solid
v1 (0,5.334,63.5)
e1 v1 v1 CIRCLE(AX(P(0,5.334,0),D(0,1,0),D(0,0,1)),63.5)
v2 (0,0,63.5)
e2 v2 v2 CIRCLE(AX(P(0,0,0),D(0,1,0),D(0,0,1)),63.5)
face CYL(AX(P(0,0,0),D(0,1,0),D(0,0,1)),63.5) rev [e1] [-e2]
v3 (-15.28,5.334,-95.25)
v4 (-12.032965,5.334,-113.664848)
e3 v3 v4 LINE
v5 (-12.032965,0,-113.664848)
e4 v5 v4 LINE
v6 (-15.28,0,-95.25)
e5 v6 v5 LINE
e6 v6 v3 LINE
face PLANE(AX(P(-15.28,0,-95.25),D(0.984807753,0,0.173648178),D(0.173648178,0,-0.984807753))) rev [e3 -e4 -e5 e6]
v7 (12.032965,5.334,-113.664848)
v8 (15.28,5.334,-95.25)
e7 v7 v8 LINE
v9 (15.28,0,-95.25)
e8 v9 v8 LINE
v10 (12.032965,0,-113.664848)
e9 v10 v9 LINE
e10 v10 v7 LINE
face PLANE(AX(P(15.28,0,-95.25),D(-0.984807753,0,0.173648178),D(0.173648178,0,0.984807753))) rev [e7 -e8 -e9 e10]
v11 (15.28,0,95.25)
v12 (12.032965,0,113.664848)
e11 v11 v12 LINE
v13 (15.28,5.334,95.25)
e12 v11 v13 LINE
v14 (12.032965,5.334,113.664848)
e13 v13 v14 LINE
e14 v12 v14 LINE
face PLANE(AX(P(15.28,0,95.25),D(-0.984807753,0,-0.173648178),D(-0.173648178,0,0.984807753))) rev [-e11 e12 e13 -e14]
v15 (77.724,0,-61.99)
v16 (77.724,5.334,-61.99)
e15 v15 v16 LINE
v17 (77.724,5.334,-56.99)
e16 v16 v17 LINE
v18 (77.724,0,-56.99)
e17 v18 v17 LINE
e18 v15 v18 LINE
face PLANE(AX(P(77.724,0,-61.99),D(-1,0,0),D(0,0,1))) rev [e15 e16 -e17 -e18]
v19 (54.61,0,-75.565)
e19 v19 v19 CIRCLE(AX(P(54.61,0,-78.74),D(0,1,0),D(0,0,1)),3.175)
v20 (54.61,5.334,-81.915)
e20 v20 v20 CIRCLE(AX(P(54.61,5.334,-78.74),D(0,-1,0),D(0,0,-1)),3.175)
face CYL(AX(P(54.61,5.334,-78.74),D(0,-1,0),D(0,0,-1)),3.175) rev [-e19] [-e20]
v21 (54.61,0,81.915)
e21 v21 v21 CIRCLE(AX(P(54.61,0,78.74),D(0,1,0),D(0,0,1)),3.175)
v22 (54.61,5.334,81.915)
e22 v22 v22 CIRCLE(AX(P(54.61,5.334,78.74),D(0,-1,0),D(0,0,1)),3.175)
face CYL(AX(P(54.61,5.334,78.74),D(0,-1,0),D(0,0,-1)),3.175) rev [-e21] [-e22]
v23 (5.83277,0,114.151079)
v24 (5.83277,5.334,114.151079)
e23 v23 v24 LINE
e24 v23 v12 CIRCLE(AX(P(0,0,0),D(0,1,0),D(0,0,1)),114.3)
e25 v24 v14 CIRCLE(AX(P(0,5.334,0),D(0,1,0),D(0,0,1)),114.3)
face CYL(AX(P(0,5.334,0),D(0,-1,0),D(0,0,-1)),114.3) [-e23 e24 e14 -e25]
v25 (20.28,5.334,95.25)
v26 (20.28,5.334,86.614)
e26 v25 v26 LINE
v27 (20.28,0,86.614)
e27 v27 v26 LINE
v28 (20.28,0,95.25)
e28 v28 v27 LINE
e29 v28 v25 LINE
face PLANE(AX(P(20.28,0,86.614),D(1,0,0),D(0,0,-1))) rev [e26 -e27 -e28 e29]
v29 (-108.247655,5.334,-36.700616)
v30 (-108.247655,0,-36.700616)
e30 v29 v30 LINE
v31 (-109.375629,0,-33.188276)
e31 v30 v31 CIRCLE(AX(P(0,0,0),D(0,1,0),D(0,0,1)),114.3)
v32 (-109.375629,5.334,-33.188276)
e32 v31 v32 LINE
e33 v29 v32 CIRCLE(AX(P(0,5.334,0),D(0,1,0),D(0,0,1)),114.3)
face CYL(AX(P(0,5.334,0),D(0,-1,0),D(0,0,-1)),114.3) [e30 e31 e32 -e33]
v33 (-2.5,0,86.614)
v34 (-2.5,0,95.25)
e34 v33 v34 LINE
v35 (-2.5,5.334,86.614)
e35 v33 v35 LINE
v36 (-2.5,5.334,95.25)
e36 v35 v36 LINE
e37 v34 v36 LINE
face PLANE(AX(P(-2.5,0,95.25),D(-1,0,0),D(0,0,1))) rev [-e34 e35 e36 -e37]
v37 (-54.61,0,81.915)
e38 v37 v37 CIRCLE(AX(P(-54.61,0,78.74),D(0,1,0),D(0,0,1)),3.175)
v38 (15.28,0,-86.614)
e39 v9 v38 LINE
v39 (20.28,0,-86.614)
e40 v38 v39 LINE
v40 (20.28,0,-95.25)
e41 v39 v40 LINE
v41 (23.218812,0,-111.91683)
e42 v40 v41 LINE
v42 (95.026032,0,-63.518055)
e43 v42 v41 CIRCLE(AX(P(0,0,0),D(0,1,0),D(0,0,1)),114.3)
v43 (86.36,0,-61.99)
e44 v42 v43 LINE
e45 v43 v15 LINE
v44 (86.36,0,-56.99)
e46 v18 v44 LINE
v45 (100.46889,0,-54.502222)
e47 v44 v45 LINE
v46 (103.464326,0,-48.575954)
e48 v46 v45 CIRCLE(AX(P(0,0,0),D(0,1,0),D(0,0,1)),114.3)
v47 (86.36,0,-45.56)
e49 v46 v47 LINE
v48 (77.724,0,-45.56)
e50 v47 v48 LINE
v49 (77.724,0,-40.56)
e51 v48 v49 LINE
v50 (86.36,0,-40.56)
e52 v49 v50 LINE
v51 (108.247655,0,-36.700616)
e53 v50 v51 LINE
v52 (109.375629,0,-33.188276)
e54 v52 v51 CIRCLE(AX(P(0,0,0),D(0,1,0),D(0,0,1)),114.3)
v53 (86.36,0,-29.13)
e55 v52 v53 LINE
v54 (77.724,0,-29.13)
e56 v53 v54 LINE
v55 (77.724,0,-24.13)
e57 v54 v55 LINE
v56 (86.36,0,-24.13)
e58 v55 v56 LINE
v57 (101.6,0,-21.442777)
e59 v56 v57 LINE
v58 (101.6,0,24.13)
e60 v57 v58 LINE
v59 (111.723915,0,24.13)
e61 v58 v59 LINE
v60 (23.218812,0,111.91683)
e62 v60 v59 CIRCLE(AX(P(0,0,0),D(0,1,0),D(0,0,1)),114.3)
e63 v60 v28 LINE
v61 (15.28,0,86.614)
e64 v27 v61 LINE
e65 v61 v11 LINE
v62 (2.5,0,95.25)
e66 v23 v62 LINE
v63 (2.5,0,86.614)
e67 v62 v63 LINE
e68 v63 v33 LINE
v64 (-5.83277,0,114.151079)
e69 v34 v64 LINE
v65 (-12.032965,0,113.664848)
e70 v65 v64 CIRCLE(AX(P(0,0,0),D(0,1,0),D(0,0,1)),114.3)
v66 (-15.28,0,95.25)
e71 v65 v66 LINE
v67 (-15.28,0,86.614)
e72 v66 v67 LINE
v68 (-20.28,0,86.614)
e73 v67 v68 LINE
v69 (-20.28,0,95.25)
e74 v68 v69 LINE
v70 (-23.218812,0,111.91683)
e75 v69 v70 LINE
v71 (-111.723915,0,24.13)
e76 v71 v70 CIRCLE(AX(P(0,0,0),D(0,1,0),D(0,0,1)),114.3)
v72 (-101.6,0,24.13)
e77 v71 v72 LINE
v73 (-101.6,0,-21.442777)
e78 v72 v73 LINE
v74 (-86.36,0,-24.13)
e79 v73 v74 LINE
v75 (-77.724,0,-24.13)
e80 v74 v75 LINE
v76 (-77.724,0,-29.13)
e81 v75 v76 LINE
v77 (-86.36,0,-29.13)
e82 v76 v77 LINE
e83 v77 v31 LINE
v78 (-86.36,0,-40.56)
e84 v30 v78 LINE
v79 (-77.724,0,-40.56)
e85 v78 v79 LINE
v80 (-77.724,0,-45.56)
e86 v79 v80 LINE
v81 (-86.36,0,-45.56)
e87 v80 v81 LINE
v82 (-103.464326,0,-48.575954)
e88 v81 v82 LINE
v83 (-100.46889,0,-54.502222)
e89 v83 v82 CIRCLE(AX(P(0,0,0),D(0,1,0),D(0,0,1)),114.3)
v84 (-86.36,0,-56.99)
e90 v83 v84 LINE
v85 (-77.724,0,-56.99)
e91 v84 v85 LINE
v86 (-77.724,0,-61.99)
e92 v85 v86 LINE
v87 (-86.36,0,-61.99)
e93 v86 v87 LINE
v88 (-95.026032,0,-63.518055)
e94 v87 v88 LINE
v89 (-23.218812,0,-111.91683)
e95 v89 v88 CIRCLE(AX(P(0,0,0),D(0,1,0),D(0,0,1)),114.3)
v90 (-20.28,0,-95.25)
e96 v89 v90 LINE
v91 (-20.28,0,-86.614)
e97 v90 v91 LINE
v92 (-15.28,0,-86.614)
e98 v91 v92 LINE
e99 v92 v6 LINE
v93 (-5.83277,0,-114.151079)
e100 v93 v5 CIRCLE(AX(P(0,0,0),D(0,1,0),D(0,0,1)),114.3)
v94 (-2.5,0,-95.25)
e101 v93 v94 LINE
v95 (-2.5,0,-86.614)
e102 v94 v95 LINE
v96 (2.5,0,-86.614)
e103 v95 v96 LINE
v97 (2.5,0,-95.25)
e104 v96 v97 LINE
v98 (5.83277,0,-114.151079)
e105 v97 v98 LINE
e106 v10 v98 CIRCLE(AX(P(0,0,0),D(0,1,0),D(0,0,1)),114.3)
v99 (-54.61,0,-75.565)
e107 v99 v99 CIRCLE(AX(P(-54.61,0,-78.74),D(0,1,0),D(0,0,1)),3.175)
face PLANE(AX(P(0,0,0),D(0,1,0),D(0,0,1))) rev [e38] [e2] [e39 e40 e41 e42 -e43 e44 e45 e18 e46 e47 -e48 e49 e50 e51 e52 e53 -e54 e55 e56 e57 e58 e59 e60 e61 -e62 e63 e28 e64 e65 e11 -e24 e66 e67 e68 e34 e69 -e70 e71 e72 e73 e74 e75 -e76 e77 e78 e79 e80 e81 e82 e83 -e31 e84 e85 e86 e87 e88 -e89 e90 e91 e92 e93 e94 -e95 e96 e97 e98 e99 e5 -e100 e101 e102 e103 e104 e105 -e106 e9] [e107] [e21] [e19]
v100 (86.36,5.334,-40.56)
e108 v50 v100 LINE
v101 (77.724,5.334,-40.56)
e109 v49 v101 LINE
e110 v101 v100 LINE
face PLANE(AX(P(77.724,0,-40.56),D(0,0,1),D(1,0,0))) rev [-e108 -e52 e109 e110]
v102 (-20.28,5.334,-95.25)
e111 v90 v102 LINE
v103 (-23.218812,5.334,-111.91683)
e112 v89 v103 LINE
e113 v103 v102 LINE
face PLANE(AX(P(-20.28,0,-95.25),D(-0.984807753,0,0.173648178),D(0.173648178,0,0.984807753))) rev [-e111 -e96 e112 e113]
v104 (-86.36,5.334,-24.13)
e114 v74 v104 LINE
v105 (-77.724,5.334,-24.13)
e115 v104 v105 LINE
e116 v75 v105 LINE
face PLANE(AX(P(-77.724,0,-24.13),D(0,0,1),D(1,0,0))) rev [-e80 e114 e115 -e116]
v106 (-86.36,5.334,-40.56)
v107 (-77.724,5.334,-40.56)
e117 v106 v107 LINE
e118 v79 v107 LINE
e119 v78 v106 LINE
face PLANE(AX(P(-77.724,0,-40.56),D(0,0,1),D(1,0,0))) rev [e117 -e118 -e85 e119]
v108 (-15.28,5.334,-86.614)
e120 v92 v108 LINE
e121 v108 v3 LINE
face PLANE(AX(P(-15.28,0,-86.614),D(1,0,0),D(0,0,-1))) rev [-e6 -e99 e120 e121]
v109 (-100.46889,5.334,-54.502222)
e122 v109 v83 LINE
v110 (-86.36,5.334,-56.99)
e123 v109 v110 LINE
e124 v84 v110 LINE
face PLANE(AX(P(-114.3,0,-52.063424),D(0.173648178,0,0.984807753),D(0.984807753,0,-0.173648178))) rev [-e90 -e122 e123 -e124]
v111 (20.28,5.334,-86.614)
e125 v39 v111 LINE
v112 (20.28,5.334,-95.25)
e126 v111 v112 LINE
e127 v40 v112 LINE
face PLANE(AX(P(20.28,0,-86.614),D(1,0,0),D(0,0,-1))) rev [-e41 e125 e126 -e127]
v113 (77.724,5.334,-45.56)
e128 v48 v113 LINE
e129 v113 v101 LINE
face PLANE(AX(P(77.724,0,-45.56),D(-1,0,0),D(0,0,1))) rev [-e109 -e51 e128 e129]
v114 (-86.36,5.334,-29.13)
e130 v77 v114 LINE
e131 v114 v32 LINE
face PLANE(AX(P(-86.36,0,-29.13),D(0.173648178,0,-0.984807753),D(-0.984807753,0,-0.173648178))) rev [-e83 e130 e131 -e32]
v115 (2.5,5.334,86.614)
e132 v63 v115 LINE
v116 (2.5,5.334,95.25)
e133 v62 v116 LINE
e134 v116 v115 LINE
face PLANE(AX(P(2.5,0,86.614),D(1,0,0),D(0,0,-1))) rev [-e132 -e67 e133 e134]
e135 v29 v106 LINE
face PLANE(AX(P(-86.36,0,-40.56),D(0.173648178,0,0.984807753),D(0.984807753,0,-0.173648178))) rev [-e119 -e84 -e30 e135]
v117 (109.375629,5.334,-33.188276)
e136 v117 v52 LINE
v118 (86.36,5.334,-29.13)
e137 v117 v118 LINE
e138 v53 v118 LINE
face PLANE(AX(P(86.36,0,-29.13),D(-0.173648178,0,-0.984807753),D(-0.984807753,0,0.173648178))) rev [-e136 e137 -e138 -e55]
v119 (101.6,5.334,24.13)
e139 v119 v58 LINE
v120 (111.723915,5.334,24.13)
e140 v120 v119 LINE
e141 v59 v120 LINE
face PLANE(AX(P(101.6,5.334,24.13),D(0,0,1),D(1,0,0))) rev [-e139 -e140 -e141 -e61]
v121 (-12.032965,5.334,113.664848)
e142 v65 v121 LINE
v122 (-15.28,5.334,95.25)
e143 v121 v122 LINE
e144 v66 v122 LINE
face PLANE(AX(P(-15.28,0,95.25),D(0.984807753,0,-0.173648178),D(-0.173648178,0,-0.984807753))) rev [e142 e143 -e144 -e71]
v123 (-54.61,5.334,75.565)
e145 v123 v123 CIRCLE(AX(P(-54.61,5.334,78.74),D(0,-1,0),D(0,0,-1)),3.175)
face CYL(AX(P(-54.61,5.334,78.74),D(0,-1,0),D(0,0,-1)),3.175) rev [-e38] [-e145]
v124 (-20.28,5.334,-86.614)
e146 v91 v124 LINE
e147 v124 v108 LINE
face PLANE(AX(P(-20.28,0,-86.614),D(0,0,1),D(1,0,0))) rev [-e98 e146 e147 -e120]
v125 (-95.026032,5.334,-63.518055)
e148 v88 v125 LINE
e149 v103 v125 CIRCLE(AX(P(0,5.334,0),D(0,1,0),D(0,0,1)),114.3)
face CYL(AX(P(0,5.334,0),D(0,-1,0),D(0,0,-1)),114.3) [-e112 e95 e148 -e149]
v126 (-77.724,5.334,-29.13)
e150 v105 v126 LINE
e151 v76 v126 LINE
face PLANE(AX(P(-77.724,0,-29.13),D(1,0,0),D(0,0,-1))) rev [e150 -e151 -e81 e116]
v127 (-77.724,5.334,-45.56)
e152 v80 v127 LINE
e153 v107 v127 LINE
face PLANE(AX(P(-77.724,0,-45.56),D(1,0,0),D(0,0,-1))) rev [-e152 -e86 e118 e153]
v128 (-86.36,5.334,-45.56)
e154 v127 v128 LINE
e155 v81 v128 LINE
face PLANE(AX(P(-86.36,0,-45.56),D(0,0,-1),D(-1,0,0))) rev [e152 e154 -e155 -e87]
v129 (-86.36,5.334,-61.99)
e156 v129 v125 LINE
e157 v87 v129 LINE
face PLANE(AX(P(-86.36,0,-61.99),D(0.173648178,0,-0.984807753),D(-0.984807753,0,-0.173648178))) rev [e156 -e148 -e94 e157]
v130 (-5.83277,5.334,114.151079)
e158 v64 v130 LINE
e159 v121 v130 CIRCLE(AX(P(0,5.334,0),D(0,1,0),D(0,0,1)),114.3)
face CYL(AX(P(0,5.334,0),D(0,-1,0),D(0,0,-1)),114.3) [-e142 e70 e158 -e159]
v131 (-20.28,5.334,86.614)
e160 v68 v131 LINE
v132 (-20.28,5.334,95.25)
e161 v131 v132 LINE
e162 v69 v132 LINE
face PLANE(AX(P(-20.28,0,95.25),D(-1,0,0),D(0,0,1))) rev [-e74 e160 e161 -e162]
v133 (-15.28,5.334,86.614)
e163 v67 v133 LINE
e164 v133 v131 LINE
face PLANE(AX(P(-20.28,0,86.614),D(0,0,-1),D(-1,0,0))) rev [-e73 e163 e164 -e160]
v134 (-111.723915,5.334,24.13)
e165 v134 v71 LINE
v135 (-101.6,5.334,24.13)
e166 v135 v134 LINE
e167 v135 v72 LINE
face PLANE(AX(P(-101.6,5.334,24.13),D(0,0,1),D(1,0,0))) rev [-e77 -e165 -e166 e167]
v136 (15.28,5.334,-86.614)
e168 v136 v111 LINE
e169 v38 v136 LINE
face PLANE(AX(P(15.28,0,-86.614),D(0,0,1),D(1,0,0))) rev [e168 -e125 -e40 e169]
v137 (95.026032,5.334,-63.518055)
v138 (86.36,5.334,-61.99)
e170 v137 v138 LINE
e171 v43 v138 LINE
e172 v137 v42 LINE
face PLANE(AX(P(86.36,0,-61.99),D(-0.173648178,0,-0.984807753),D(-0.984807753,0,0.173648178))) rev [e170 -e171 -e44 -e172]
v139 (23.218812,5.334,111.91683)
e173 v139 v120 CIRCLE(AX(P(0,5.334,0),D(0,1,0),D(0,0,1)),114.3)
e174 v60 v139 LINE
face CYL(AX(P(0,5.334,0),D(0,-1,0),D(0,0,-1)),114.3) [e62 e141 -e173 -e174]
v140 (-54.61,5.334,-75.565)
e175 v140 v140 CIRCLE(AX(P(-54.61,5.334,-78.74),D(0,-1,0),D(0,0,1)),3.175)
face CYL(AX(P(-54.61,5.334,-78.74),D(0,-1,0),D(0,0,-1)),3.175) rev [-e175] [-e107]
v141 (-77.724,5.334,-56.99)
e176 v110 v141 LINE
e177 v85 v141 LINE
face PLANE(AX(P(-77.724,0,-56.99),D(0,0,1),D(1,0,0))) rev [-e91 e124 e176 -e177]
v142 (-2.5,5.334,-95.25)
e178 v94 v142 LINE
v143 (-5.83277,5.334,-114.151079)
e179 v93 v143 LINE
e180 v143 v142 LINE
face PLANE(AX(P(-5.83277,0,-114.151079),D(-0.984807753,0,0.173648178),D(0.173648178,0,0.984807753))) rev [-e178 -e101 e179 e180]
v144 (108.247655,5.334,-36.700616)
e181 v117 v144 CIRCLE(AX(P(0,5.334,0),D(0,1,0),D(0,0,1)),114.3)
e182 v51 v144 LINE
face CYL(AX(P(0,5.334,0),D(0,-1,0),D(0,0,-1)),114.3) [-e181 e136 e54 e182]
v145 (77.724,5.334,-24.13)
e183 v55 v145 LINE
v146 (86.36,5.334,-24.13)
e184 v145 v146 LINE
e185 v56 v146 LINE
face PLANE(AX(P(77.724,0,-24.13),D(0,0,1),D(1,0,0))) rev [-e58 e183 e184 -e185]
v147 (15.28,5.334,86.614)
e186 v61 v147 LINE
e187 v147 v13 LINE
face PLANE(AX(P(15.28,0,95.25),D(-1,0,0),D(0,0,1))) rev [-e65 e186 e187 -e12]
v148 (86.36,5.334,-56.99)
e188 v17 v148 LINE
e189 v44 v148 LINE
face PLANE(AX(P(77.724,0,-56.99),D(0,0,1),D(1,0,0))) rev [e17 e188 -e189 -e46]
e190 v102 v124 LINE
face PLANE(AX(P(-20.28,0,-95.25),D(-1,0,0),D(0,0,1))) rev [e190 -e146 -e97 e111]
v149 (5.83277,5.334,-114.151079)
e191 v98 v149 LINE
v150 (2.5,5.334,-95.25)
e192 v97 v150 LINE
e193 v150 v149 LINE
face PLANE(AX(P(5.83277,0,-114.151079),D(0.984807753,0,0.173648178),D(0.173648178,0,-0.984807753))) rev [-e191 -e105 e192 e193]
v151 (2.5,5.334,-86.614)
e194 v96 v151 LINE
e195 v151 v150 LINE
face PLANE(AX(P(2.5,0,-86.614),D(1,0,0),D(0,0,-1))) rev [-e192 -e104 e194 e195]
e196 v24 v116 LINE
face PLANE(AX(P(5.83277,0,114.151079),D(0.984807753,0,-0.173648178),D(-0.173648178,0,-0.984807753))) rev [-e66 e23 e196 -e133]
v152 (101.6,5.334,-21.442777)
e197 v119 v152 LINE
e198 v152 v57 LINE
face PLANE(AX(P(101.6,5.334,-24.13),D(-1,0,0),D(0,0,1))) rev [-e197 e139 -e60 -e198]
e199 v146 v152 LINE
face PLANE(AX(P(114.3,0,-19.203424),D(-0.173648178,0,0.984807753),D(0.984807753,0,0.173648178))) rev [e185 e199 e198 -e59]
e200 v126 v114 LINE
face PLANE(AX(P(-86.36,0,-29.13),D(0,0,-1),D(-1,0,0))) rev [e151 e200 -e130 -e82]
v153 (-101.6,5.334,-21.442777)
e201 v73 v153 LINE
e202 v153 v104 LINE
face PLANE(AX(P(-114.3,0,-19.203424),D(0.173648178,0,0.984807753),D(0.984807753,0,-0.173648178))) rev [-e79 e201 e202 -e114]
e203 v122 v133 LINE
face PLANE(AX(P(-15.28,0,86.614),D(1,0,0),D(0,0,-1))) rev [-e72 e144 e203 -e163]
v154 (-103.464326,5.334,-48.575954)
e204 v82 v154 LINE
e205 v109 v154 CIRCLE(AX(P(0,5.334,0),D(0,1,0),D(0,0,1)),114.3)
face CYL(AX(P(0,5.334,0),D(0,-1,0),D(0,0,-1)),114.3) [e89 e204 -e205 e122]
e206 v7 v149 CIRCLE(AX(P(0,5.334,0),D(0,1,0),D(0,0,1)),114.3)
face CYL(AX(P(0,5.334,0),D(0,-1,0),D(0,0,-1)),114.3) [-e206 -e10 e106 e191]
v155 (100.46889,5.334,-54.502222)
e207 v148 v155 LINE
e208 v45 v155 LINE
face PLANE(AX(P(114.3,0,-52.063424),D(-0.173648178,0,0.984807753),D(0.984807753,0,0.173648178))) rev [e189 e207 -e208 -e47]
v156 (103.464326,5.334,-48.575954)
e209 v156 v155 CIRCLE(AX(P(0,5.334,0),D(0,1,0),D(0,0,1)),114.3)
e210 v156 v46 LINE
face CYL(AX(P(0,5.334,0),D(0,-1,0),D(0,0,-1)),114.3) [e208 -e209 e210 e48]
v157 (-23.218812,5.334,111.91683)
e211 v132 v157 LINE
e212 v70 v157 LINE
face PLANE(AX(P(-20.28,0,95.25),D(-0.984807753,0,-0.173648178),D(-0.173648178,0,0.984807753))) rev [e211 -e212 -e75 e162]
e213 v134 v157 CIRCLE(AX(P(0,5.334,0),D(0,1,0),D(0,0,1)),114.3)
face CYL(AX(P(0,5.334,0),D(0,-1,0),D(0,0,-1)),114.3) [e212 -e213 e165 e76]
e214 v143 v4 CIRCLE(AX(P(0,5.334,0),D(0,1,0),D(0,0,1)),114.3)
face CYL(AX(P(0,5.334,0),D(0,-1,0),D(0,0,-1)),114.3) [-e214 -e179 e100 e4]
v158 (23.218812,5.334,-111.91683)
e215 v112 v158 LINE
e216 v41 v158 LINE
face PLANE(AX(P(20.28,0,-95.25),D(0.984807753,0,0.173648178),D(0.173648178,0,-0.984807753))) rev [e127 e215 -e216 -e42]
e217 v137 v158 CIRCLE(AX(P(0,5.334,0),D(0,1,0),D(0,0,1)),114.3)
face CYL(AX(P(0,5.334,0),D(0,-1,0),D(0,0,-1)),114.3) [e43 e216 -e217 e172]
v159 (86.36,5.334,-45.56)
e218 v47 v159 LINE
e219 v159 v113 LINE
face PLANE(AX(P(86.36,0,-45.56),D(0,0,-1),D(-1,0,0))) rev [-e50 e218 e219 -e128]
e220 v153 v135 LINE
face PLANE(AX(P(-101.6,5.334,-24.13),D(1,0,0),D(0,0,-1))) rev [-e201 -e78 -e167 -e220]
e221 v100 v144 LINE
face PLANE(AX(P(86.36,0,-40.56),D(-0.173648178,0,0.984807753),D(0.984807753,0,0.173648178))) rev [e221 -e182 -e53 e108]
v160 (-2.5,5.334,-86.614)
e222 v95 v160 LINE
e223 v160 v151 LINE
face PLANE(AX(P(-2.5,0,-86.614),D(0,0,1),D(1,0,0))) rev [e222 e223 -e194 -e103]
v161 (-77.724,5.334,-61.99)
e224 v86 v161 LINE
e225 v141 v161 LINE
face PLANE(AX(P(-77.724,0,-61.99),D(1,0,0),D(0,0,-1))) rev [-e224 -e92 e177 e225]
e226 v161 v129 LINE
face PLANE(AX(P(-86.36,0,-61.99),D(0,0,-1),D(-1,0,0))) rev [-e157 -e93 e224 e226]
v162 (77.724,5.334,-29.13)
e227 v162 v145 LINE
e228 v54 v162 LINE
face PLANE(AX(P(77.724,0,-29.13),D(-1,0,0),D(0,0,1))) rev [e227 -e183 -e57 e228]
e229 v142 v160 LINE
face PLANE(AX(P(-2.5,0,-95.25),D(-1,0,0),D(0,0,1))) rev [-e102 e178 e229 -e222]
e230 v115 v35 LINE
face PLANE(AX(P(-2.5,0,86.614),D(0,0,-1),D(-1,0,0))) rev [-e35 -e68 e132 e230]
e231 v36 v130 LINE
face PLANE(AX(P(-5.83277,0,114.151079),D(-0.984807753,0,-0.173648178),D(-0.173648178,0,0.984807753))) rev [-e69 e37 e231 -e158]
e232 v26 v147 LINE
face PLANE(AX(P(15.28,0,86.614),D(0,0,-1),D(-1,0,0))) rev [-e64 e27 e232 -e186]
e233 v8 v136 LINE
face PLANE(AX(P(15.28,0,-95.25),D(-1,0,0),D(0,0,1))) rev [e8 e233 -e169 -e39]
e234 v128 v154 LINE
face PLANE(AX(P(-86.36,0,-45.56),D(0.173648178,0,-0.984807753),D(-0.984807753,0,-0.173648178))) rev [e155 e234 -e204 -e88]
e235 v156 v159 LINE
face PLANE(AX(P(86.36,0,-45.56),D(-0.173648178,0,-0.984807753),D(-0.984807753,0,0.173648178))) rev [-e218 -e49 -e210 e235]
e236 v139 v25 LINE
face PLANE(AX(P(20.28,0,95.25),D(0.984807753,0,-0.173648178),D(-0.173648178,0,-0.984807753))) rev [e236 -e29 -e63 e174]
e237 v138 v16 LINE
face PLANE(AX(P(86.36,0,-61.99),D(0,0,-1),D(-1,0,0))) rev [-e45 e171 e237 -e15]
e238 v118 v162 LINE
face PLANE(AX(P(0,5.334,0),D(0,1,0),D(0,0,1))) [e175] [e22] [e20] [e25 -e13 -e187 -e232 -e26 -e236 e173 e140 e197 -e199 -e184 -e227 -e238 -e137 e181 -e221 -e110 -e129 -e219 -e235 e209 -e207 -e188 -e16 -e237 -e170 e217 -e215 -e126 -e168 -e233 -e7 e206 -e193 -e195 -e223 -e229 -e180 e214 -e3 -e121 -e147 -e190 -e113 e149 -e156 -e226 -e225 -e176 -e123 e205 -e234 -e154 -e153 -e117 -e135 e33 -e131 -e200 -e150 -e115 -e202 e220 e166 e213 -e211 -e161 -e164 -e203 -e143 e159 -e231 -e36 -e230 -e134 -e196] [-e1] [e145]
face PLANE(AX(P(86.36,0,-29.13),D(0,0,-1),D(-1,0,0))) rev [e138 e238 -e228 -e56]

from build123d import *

# Parameters (mm, degrees)
SKETCH1_R            = 114.3
BASE_DEPTH           = 5.334
SKETCH2_R            = 63.5
CENTER_CUT_DEPTH     = 162.732592745
SENSOR_CUTOUTS_DEPTH = 162.732592745
SKETCH7_W            = 30.48
SKETCH7_H            = 48.26
CUT_EXTRUDE2_DEPTH   = 162.891213524
HOLE3_OUTLINE_R      = 3.175
HOLE3_DEPTH          = 5.334


# Read off the part's stored shape, not the designer's step: Hole3
with BuildPart() as part:
    # Sketch1 → Base (new body)
    with BuildSketch(Plane(origin=(0, 0, 0), x_dir=(1, 0, 0), z_dir=(0, 1, 0))):
        with Locations(Location((0, 0, 0), (0, 0, 270))):
            Circle(SKETCH1_R)
    extrude(amount=BASE_DEPTH)

    # Sketch2 → Center Cut (cut, through all)
    with BuildSketch(Plane(origin=(0, 5.334, 0), x_dir=(1, 0, 0), z_dir=(0, 1, 0))):
        with Locations(Location((0, 0, 0), (0, 0, 270))):
            Circle(SKETCH2_R)
    extrude(amount=-CENTER_CUT_DEPTH, mode=Mode.SUBTRACT)

    # Sketch3 → Sensor Cutouts (cut, through all)
    with BuildSketch(Plane(origin=(0, 5.334, 0), x_dir=(1, 0, 0), z_dir=(0, 1, 0))):
        with BuildLine():
            Line((5.832770158, 114.151078805), (2.5, 95.25))
            Line((2.5, 95.25), (2.5, 86.614))
            Line((2.5, 86.614), (-2.5, 86.614))
            Line((-2.5, 86.614), (-2.5, 95.25))
            Line((-2.5, 95.25), (-5.832770158, 114.151078805))
            ThreePointArc((-5.832770158, 114.151078805), (0, 114.3), (5.832770158, 114.151078805))
        make_face()
        with BuildLine():
            Line((20.28, 95.25), (23.218811767, 111.916829745))
            ThreePointArc((23.218811767, 111.916829745), (17.647544886, 112.929421142), (12.032965395, 113.664848321))
            Line((12.032965395, 113.664848321), (15.28, 95.25))
            Line((15.28, 95.25), (15.28, 86.614))
            Line((15.28, 86.614), (20.28, 86.614))
            Line((20.28, 86.614), (20.28, 95.25))
        make_face()
        with BuildLine():
            Line((-20.28, 95.25), (-23.218811767, 111.916829745))
            ThreePointArc((-23.218811767, 111.916829745), (-17.647544886, 112.929421142), (-12.032965395, 113.664848321))
            Line((-12.032965395, 113.664848321), (-15.28, 95.25))
            Line((-15.28, 95.25), (-15.28, 86.614))
            Line((-15.28, 86.614), (-20.28, 86.614))
            Line((-20.28, 86.614), (-20.28, 95.25))
        make_face()
        Polygon((86.36, 45.56), (114.3, 50.486575841), (114.3, 35.633424159), (86.36, 40.56), (77.724, 40.56), (77.724, 45.56), align=None)
        Polygon((86.36, 61.99), (114.3, 66.916575841), (114.3, 52.063424159), (86.36, 56.99), (77.724, 56.99), (77.724, 61.99), align=None)
        Polygon((86.36, 29.13), (114.3, 34.056575841), (114.3, 19.203424159), (86.36, 24.13), (77.724, 24.13), (77.724, 29.13), align=None)
        with BuildLine():
            Line((15.28, -95.25), (15.28, -86.614))
            Line((15.28, -86.614), (20.28, -86.614))
            Line((20.28, -86.614), (20.28, -95.25))
            Line((20.28, -95.25), (23.218811767, -111.916829745))
            ThreePointArc((23.218811767, -111.916829745), (17.647544886, -112.929421142), (12.032965395, -113.664848321))
            Line((12.032965395, -113.664848321), (15.28, -95.25))
        make_face()
        with BuildLine():
            Line((2.5, -86.614), (2.5, -95.25))
            Line((2.5, -95.25), (5.832770158, -114.151078805))
            ThreePointArc((5.832770158, -114.151078805), (0, -114.3), (-5.832770158, -114.151078805))
            Line((-5.832770158, -114.151078805), (-2.5, -95.25))
            Line((-2.5, -95.25), (-2.5, -86.614))
            Line((-2.5, -86.614), (2.5, -86.614))
        make_face()
        with BuildLine():
            Line((-15.28, -86.614), (-15.28, -95.25))
            Line((-15.28, -95.25), (-12.032965395, -113.664848321))
            ThreePointArc((-12.032965395, -113.664848321), (-17.647544886, -112.929421142), (-23.218811767, -111.916829745))
            Line((-23.218811767, -111.916829745), (-20.28, -95.25))
            Line((-20.28, -95.25), (-20.28, -86.614))
            Line((-20.28, -86.614), (-15.28, -86.614))
        make_face()
        Polygon((-77.724, 24.13), (-86.36, 24.13), (-114.3, 19.203424159), (-114.3, 34.056575841), (-86.36, 29.13), (-77.724, 29.13), align=None)
        Polygon((-77.724, 40.56), (-86.36, 40.56), (-114.3, 35.633424159), (-114.3, 50.486575841), (-86.36, 45.56), (-77.724, 45.56), align=None)
        Polygon((-77.724, 56.99), (-86.36, 56.99), (-114.3, 52.063424159), (-114.3, 66.916575841), (-86.36, 61.99), (-77.724, 61.99), align=None)
    extrude(amount=-SENSOR_CUTOUTS_DEPTH, mode=Mode.SUBTRACT)

    # Sketch7 → Cut-Extrude2 (cut, through all)
    with BuildSketch(Plane.XZ.offset(5.334)):
        with Locations((-116.84, 0)):
            Rectangle(SKETCH7_W, SKETCH7_H)
        with Locations((116.84, 0)):
            Rectangle(SKETCH7_W, SKETCH7_H)
    extrude(amount=-CUT_EXTRUDE2_DEPTH, mode=Mode.SUBTRACT)

    # Hole3 outline → Hole3 (cut)
    with BuildSketch(Plane(origin=(0, 0, 0), x_dir=(1, 0, 0), z_dir=(0, 1, 0))):
        with Locations((-54.61, -78.74)):
            Circle(HOLE3_OUTLINE_R)
        with Locations((54.61, -78.74)):
            Circle(HOLE3_OUTLINE_R)
        with Locations((54.61, 78.74)):
            Circle(HOLE3_OUTLINE_R)
        with Locations((-54.61, 78.74)):
            Circle(HOLE3_OUTLINE_R)
    extrude(amount=HOLE3_DEPTH, mode=Mode.SUBTRACT)


solid = part.part
